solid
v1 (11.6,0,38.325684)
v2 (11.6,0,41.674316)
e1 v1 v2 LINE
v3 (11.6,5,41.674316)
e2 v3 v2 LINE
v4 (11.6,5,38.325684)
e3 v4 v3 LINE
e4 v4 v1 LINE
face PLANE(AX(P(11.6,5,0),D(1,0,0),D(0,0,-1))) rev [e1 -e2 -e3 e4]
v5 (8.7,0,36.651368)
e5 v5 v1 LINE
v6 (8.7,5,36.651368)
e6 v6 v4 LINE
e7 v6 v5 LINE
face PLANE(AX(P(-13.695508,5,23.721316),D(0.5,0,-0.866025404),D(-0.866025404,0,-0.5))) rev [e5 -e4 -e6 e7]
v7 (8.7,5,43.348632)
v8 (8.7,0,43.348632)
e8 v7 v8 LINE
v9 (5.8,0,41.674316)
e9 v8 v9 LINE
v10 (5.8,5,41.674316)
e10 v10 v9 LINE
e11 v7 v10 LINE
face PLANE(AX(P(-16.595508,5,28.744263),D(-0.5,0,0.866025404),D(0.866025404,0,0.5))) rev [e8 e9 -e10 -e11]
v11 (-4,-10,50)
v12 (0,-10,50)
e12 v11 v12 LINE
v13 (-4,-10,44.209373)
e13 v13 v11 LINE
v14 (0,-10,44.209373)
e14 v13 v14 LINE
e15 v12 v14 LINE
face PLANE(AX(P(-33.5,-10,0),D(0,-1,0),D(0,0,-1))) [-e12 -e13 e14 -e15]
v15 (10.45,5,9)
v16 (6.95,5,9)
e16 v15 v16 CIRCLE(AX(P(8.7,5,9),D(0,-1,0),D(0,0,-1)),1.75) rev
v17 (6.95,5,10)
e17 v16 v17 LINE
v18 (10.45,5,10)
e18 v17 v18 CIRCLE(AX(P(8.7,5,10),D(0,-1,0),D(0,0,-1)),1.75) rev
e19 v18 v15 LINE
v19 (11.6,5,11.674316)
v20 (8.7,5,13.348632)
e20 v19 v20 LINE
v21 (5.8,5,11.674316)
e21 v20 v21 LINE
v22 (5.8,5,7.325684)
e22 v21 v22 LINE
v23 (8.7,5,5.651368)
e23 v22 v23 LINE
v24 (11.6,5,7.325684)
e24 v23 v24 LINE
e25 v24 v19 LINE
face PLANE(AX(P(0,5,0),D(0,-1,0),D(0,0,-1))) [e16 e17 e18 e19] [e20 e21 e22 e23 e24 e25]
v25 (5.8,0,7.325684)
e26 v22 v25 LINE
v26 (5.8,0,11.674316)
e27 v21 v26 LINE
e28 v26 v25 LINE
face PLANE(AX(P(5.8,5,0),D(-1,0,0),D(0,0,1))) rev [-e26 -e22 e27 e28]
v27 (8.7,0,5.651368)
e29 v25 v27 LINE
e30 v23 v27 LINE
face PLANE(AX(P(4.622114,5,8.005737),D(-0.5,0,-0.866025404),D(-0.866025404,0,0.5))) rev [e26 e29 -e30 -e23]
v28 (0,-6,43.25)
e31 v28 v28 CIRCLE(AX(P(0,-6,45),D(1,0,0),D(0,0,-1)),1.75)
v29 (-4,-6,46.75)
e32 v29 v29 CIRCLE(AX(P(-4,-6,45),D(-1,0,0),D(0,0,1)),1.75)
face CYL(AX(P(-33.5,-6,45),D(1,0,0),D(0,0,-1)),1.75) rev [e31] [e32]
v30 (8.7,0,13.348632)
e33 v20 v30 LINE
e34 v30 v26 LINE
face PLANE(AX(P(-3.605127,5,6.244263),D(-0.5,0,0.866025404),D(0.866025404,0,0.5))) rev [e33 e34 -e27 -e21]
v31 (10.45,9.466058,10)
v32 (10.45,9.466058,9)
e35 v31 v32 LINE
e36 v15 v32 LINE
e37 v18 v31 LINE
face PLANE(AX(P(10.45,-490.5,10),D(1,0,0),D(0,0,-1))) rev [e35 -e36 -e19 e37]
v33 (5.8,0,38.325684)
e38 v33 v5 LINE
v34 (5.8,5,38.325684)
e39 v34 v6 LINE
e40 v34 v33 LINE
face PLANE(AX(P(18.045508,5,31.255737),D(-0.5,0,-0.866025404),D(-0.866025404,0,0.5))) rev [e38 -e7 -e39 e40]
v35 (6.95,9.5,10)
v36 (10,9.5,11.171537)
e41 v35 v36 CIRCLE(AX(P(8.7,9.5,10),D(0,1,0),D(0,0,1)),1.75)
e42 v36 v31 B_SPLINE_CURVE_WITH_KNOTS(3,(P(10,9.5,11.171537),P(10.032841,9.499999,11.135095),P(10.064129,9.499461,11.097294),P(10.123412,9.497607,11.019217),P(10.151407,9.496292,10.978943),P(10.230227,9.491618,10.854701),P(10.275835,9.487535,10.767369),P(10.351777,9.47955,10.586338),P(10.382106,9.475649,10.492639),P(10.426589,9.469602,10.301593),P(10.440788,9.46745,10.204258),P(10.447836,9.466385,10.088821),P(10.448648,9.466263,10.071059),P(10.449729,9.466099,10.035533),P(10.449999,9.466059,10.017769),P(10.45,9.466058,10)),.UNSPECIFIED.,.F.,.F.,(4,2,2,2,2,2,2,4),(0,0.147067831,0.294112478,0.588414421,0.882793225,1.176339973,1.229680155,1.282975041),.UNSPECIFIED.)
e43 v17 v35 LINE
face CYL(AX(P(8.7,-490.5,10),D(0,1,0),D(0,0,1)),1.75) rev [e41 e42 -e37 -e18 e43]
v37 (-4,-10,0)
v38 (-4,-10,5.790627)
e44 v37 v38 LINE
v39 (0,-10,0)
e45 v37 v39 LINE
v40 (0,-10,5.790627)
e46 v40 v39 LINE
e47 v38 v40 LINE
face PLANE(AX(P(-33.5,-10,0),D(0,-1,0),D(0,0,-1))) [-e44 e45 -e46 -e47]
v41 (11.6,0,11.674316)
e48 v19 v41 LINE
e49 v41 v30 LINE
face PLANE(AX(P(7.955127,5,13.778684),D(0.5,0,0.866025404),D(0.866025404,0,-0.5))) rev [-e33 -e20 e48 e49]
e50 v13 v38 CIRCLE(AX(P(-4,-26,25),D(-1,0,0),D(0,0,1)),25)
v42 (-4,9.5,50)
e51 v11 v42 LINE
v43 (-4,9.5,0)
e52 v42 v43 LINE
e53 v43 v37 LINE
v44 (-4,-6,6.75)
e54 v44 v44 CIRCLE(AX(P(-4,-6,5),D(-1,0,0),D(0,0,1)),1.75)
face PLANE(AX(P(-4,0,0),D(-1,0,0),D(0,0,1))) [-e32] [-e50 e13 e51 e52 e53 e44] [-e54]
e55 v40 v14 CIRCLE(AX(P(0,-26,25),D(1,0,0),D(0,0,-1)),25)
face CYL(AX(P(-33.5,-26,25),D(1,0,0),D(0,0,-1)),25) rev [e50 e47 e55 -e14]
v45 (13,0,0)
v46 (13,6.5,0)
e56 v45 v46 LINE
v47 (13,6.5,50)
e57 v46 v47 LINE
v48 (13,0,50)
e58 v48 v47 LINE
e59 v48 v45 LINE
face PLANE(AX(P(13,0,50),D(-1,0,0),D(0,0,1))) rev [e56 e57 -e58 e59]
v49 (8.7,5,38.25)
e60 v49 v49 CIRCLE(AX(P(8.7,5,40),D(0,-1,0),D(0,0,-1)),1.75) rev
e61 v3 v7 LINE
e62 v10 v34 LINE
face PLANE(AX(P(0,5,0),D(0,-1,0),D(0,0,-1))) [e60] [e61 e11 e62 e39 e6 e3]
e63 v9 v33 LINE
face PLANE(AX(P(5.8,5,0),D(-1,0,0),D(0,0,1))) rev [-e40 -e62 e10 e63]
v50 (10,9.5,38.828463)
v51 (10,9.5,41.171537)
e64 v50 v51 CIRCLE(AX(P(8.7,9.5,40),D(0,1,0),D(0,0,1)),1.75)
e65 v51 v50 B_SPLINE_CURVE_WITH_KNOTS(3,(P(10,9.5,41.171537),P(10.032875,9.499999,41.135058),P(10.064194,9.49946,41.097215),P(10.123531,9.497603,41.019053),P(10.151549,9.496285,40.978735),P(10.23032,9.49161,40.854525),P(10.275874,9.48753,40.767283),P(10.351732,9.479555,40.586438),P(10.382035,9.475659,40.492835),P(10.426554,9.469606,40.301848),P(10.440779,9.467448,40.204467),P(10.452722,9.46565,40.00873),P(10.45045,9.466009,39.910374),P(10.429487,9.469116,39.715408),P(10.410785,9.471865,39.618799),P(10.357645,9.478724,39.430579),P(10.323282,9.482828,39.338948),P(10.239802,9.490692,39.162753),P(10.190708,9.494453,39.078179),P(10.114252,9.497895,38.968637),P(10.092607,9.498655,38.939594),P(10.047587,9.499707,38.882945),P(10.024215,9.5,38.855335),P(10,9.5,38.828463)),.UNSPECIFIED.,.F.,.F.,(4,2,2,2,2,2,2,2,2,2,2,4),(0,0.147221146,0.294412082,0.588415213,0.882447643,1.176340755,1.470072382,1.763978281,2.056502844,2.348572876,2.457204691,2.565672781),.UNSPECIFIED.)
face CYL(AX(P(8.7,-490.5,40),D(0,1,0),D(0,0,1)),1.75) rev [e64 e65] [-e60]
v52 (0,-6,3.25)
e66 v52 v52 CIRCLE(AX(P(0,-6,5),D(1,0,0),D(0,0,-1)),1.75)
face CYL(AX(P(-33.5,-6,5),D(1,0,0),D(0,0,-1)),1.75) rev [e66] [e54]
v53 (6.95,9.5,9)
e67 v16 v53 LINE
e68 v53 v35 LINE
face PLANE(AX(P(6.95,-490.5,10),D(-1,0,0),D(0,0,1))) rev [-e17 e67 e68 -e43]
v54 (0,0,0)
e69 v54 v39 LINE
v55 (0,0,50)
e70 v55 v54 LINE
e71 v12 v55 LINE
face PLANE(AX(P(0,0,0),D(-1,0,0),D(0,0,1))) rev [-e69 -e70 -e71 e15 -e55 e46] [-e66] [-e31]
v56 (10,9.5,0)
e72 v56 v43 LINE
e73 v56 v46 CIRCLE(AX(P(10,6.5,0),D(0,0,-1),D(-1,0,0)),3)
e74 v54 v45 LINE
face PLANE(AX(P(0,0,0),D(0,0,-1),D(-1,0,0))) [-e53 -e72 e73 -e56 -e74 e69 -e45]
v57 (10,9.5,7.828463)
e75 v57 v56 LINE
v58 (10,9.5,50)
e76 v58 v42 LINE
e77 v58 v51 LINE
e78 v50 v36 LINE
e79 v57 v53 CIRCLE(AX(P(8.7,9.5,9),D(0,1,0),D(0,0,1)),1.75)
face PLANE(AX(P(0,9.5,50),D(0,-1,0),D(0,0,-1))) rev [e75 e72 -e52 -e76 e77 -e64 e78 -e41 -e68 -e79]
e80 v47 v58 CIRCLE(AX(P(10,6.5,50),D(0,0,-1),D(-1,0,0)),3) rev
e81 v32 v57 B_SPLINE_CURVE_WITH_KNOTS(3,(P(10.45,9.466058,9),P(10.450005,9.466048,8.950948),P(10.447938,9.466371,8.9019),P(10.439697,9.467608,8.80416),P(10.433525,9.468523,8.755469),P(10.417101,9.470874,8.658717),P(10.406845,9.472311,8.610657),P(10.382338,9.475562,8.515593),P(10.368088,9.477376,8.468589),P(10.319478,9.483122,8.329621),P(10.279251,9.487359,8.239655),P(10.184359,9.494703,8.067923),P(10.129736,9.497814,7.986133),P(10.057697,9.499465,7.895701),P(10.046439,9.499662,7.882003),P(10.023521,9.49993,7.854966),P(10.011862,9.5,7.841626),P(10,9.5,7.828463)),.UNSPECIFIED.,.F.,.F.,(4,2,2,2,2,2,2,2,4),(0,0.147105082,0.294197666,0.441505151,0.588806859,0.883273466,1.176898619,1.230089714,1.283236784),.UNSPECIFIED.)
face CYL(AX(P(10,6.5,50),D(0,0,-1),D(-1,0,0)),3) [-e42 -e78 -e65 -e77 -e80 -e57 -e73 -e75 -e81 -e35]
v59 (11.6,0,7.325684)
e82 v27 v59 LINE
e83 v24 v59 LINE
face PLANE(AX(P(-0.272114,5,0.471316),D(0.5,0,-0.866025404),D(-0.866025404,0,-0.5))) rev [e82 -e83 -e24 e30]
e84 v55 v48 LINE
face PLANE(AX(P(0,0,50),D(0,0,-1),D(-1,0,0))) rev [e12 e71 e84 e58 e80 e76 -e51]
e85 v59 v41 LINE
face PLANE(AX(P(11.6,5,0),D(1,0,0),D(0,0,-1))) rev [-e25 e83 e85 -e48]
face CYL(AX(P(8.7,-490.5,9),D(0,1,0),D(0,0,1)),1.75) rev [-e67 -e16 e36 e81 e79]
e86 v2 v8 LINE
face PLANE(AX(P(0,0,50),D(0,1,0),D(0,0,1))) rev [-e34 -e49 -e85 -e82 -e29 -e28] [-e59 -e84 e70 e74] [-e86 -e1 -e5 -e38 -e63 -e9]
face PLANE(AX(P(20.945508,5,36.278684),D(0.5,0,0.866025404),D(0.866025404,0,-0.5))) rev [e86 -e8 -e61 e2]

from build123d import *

# Parameters (mm, degrees)
ESQUISSE1_W             = 13
ESQUISSE1_H             = 9.5
BOSS_EXTRU_1_DEPTH      = 50
ESQUISSE2_R             = 1.75
ENL_V_MAT_EXTRU_1_DEPTH = 500
ESQUISSE3_W             = 50
ESQUISSE3_H             = 61.5
BOSS_EXTRU_2_DEPTH      = 4
ESQUISSE4_R             = 1.75
ENL_V_MAT_EXTRU_2_DEPTH = 33.5
CONG_2_R                = 3
ENL_V_START             = -5
ESQUISSE5_R             = 1.75
ENL_V_MAT_EXTRU_3_DEPTH = 5


with BuildPart() as part:
    # Esquisse1 → Boss.-Extru.1 (new body)
    with BuildSketch(Plane.XY):
        with Locations((6.5, 4.75)):
            Rectangle(ESQUISSE1_W, ESQUISSE1_H)
    extrude(amount=BOSS_EXTRU_1_DEPTH)

    # Esquisse2 → Enlèv. mat.-Extru.1 (cut)
    with BuildSketch(Plane(origin=(0, 9.5, 0), x_dir=(1, 0, 0), z_dir=(0, 1, 0))):
        with Locations(Location((8.7, -40, 0), (0, 0, 270))):
            Circle(ESQUISSE2_R)
        with BuildLine():
            Line((6.95, -10), (6.95, -9))
            ThreePointArc((6.95, -9), (8.7, -7.25), (10.45, -9))
            Line((10.45, -9), (10.45, -10))
            ThreePointArc((10.45, -10), (8.7, -11.75), (6.95, -10))
        make_face()
    extrude(amount=-ENL_V_MAT_EXTRU_1_DEPTH, mode=Mode.SUBTRACT)

    # Esquisse3 → Boss.-Extru.2 (add)
    with BuildSketch(Plane.ZY):
        with Locations((25, -21.25)):
            Rectangle(ESQUISSE3_W, ESQUISSE3_H)
    extrude(amount=BOSS_EXTRU_2_DEPTH)

    # Esquisse4 → Enlèv. mat.-Extru.2 (cut)
    with BuildSketch(Plane(origin=(0, 0, 0), x_dir=(0, 0, -1), z_dir=(1, 0, 0))):
        with BuildLine():
            Line((-44.209372712, -10), (-50, -10))
            Line((-50, -10), (-50, -52))
            Line((-50, -52), (0, -52))
            Line((0, -52), (0, -10))
            Line((0, -10), (-5.790627288, -10))
            ThreePointArc((-5.790627288, -10), (-25, -1), (-44.209372712, -10))
        make_face()
        with Locations((-45, -6)):
            Circle(ESQUISSE4_R)
        with Locations((-5, -6)):
            Circle(ESQUISSE4_R)
    extrude(amount=-ENL_V_MAT_EXTRU_2_DEPTH, mode=Mode.SUBTRACT)

    # Congé2
    # the kernel refuses this fillet: 3 mm, written as the material it takes off along each edge
    with BuildSketch(Plane(origin=(13, 9.5, -7.5), x_dir=(0, -1, 0), z_dir=(0, 0, 1))) as cong_2_piece_1:
        with BuildLine():
            CenterArc((CONG_2_R, -CONG_2_R), CONG_2_R, 90, 90)
            Line((0, -CONG_2_R), (0, 0))
            Line((0, 0), (CONG_2_R, 0))
        make_face()
    extrude(amount=65, mode=Mode.SUBTRACT)

    # Esquisse5 → Enlèv. mat.-Extru.3 (cut)
    # profile 1 of 4: a face of its own
    with BuildSketch(Plane(origin=(0, 0, 0), x_dir=(-1, 0, 0), z_dir=(0, -1, 0)).offset(ENL_V_START)):
        Polygon((-5.8, -38.325684219), (-8.7, -36.651368439), (-11.6, -38.325684219), (-11.6, -41.674315781), (-8.7, -43.348631561), (-5.8, -41.674315781), align=None)
        with Locations(Location((-8.7, -40, 0), (0, 0, 222.024627579))):
            Circle(ESQUISSE5_R, mode=Mode.SUBTRACT)
    # profile 2 of 4: a face of its own
    with BuildSketch(Plane(origin=(0, 0, 0), x_dir=(-1, 0, 0), z_dir=(0, -1, 0)).offset(ENL_V_START)):
        Polygon((-11.6, -7.325684219), (-11.6, -8.325684219), (-8.7, -6.651368439), (-5.8, -8.325684219), (-5.8, -7.325684219), (-8.7, -5.651368439), align=None)
    # profile 3 of 4: a face of its own
    with BuildSketch(Plane(origin=(0, 0, 0), x_dir=(-1, 0, 0), z_dir=(0, -1, 0)).offset(ENL_V_START)):
        Polygon((-11.6, -10.674315781), (-11.6, -11.674315781), (-8.7, -13.348631561), (-5.8, -11.674315781), (-5.8, -10.674315781), (-8.7, -12.348631561), align=None)
    # profile 4 of 4: a face of its own
    with BuildSketch(Plane(origin=(0, 0, 0), x_dir=(-1, 0, 0), z_dir=(0, -1, 0)).offset(ENL_V_START)):
        Polygon((-11.6, -8.325684219), (-11.6, -10.674315781), (-8.7, -12.348631561), (-5.8, -10.674315781), (-5.8, -8.325684219), (-8.7, -6.651368439), align=None)
        with BuildLine():
            ThreePointArc((-10.45, -9), (-8.7, -7.25), (-6.95, -9))
            Line((-6.95, -9), (-6.95, -10))
            ThreePointArc((-6.95, -10), (-8.7, -11.75), (-10.45, -10))
            Line((-10.45, -10), (-10.45, -9))
        make_face(mode=Mode.SUBTRACT)
    extrude(amount=ENL_V_MAT_EXTRU_3_DEPTH, mode=Mode.SUBTRACT)


solid = part.part
